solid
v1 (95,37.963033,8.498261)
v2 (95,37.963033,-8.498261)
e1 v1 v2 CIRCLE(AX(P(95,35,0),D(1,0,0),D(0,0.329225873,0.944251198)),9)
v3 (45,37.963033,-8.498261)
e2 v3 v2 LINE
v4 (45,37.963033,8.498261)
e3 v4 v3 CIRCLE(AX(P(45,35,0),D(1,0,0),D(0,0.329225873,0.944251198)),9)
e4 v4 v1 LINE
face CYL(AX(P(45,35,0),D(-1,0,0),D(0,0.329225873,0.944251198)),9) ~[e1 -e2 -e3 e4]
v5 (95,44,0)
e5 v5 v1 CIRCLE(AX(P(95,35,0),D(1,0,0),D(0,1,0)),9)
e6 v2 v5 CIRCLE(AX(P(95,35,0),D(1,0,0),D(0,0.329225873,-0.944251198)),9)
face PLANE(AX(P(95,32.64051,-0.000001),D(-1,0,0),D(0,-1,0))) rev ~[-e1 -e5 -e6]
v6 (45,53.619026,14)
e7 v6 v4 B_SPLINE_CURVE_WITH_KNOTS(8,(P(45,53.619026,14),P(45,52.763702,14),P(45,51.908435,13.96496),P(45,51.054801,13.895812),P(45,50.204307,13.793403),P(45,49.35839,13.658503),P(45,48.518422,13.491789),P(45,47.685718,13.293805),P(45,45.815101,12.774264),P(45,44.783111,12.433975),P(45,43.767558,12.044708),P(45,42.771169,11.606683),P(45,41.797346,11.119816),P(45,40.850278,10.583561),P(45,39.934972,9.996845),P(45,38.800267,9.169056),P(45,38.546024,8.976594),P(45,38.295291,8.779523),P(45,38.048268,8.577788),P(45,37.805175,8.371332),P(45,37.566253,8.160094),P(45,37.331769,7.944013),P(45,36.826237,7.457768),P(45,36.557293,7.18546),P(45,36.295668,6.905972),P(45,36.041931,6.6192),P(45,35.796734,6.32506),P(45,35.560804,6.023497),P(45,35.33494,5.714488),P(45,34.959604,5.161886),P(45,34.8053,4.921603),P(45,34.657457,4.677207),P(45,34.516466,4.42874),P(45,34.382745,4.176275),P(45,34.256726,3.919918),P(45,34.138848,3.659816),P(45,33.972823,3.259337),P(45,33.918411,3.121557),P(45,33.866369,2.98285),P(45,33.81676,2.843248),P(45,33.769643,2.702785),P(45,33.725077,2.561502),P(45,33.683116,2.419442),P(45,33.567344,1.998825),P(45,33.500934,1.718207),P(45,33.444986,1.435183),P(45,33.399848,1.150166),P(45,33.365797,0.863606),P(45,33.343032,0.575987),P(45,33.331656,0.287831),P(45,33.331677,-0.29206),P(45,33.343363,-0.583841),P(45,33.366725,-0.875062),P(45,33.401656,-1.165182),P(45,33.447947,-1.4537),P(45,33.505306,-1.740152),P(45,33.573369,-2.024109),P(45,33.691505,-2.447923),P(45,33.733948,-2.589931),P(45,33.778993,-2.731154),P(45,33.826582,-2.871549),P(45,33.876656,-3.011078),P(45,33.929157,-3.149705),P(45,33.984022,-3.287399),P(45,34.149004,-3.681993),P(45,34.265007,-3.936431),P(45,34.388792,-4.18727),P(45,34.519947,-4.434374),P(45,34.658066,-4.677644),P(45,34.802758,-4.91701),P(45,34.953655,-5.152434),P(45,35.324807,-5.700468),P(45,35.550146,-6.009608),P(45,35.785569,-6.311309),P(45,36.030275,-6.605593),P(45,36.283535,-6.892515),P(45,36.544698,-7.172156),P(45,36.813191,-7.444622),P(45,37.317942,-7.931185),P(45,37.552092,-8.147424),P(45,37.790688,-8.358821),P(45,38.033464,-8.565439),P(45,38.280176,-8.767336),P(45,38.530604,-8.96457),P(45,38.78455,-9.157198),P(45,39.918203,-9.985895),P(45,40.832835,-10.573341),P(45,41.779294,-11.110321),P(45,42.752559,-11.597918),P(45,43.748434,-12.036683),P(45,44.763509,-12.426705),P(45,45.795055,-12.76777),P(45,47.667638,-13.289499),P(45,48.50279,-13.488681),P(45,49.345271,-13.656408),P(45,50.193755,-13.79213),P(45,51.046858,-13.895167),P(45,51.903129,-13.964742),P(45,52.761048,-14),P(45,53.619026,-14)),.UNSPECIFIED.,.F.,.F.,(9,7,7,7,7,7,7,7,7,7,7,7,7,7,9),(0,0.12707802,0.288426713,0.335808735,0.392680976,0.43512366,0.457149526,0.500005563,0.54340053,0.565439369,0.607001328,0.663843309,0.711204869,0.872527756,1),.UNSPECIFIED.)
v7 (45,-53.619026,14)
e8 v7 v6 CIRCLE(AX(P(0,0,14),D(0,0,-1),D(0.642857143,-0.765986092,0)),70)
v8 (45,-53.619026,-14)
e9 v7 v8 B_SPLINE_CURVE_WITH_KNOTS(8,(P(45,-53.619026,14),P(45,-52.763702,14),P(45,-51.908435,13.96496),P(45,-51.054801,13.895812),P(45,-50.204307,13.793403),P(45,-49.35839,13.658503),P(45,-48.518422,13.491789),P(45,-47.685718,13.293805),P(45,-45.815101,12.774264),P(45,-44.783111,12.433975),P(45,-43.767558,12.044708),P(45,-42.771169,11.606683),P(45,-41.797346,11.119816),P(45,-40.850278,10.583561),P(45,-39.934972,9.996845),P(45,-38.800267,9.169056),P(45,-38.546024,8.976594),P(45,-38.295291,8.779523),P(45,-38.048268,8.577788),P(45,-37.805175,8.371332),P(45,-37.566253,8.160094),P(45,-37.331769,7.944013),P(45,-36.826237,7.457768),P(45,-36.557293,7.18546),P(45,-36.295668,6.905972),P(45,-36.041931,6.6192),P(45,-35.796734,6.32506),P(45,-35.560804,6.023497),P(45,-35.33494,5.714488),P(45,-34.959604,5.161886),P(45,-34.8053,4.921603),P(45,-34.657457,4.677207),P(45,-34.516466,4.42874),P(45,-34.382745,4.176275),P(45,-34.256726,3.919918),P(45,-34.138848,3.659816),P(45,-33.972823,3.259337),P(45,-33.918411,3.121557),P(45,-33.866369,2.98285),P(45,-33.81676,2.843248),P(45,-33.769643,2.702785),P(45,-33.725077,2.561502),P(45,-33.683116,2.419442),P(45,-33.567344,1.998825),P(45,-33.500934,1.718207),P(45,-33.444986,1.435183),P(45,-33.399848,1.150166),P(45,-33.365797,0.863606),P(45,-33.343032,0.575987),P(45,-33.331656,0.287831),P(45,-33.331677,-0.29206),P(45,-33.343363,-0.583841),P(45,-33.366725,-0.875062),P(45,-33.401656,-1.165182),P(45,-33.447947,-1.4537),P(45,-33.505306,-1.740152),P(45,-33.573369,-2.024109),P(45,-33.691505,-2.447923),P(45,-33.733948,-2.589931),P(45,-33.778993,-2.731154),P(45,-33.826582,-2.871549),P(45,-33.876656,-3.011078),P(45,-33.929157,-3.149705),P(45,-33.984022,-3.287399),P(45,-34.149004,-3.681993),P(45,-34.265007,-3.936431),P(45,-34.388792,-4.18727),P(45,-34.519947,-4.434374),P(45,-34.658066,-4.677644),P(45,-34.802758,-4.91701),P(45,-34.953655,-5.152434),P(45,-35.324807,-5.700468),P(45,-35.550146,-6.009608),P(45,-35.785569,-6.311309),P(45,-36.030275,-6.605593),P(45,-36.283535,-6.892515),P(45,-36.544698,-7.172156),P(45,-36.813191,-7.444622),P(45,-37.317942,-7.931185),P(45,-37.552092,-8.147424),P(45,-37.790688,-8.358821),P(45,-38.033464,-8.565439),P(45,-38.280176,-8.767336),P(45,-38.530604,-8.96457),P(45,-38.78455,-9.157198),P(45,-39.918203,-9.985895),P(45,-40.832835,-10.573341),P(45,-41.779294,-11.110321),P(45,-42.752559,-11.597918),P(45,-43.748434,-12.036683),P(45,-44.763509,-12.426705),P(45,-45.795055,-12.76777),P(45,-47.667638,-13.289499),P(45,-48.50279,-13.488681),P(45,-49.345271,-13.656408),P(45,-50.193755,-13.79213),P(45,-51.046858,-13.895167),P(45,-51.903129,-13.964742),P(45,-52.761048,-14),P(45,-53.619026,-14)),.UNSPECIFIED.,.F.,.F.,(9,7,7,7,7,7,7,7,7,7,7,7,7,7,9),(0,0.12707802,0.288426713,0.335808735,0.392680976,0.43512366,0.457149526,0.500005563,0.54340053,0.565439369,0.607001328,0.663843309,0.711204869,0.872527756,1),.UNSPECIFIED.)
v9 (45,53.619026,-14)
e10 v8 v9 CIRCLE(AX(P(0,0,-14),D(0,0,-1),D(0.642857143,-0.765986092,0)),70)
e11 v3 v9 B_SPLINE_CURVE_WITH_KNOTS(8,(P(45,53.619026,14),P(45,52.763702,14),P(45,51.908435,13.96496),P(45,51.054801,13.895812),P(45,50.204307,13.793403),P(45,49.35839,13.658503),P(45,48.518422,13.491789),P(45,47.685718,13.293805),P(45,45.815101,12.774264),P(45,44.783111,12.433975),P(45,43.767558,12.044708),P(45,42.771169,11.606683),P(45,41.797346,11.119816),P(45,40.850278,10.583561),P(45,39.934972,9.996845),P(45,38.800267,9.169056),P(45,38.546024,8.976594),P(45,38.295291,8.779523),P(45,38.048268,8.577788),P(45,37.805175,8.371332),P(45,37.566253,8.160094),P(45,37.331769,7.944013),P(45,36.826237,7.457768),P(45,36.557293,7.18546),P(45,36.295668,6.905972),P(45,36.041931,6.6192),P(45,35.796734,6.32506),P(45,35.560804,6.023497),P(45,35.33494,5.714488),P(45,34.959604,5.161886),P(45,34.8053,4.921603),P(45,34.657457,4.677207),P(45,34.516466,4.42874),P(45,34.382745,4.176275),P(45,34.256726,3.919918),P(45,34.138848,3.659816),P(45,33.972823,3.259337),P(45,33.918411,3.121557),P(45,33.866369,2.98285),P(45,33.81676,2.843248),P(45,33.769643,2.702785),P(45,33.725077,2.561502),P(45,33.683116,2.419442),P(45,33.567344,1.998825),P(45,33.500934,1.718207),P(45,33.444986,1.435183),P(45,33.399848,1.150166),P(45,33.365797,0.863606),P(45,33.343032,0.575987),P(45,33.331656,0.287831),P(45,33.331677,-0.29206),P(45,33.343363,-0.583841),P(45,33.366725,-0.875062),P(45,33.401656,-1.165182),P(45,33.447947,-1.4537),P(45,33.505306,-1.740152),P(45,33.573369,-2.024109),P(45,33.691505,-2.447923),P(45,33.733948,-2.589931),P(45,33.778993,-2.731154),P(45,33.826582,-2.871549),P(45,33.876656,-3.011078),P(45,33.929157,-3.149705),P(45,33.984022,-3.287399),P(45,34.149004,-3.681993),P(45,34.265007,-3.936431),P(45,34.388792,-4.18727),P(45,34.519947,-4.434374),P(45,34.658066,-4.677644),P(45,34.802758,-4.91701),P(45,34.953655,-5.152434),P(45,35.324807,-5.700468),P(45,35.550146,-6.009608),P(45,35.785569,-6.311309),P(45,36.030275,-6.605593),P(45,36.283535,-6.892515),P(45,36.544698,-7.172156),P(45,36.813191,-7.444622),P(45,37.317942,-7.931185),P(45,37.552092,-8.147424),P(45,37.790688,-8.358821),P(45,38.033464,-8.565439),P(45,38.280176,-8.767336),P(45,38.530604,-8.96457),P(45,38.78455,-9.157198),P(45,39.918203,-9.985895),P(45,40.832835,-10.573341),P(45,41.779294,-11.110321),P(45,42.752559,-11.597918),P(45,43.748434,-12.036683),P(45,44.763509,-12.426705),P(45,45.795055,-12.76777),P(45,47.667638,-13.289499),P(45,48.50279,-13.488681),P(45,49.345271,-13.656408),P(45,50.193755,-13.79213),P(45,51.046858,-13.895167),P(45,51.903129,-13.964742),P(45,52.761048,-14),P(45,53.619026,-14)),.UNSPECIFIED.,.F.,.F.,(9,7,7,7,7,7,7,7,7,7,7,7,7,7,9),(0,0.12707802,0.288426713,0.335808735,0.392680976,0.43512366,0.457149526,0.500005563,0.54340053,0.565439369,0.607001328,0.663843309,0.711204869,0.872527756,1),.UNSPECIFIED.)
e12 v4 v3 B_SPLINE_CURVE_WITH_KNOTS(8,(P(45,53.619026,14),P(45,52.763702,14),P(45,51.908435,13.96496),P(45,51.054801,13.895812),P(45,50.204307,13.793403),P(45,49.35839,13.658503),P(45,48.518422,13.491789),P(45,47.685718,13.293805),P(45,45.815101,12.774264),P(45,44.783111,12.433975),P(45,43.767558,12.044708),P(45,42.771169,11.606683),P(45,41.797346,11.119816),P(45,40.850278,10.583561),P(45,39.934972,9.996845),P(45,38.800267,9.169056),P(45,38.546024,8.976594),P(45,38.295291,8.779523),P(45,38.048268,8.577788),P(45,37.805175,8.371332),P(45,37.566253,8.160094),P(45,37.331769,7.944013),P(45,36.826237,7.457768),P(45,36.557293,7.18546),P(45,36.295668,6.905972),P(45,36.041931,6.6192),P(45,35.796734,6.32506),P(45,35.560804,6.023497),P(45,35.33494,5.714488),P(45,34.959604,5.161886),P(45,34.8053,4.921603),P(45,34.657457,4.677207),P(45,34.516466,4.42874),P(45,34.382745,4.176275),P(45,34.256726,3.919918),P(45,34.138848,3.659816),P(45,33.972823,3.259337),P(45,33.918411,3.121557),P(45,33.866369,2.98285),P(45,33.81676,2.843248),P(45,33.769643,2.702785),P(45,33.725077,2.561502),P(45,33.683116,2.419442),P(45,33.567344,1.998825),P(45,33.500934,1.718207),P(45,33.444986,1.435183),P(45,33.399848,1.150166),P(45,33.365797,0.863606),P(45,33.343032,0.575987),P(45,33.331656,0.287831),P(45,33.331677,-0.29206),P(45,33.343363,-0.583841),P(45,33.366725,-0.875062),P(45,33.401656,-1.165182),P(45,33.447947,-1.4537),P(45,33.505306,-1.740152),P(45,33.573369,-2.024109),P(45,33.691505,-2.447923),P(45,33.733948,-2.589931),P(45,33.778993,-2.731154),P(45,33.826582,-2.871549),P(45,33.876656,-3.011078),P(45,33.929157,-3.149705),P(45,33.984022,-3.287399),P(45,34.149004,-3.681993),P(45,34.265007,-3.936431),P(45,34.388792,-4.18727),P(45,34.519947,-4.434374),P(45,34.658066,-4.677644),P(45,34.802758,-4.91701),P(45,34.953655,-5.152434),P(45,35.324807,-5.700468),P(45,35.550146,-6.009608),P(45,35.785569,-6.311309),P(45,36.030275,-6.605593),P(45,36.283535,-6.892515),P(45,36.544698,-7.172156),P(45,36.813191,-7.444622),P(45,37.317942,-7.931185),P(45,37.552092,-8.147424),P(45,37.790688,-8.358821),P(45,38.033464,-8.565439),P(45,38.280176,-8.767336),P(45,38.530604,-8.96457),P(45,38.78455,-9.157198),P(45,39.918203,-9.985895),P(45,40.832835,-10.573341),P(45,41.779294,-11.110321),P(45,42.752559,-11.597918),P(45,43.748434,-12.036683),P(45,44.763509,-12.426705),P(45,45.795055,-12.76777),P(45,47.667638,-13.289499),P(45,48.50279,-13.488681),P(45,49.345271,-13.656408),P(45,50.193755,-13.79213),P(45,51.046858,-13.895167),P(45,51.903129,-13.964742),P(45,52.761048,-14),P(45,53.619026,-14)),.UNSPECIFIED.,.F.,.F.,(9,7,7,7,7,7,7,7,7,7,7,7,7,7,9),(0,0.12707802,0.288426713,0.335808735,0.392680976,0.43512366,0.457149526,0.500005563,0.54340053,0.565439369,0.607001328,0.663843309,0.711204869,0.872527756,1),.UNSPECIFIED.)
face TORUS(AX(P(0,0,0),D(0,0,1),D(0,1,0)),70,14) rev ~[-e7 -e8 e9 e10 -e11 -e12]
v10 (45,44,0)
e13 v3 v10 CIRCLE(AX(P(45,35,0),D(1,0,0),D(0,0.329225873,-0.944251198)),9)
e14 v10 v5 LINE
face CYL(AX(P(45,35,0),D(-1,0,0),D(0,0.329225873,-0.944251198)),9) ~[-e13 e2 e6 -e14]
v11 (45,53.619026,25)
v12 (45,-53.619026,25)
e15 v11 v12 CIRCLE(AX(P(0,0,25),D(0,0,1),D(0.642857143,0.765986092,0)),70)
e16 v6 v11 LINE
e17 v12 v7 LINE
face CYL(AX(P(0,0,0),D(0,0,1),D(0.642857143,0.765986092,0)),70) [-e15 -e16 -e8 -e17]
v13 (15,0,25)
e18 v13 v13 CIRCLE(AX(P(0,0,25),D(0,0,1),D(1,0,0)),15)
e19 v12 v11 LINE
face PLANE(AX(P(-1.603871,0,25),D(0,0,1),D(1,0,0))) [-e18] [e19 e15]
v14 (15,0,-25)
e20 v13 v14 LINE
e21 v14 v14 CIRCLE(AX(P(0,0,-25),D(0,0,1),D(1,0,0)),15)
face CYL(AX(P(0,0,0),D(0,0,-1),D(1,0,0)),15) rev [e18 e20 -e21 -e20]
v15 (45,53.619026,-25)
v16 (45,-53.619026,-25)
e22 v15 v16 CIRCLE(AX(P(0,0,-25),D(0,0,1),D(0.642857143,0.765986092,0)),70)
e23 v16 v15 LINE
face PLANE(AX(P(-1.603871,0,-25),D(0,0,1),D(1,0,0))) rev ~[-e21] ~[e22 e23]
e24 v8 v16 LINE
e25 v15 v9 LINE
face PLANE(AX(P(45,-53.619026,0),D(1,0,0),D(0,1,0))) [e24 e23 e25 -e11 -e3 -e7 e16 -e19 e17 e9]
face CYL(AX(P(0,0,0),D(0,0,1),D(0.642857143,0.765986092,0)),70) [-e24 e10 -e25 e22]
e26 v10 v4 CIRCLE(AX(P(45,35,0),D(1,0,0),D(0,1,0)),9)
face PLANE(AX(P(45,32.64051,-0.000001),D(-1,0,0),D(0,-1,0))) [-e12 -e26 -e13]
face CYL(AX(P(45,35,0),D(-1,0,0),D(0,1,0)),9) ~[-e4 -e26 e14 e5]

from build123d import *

# Parameters (mm, degrees)
F0_R     = 15
F1_DEPTH = 25
F5_DEPTH = 50


with BuildPart() as f1:
    # F0 (on Top) → F1 (new body, symmetric)
    with BuildSketch(Plane.XY):
        with BuildLine():
            Line((45, -53.6190264738), (45, 53.6190264738))
            ThreePointArc((45, 53.6190264738), (-70, 0), (45, -53.6190264738))
        make_face()
        Circle(F0_R, mode=Mode.SUBTRACT)
    extrude(amount=F1_DEPTH, both=True)

    # F2 (on Right) → F3 (revolve, cut)
    with BuildSketch(Plane.YZ):
        with BuildLine():
            Line((70, -14), (70, 14))
            ThreePointArc((70, 14), (56, 0), (70, -14))
        make_face()
    revolve(axis=Axis((0, 0, 25), (0, 0, 1)), mode=Mode.SUBTRACT)

    # F4 (on face) → F5 (join)
    with BuildSketch(Plane.YZ.offset(45)):
        with BuildLine():
            add(Edge.make_bspline(
                [(37.9630328609, 8.4982607788), (37.8523435019, 8.4048203415), (37.7424820724, 8.3104014762), (37.6334707776, 8.2149986154), (37.525332792, 8.1186060884), (37.4180922716, 8.0212181078), (37.3117743656, 7.9228287563), (37.2064052286, 7.823431974), (36.826236873, 7.4577676485), (36.5572934764, 7.185459665), (36.2956678052, 6.9059722624), (36.041930817, 6.6191996988), (35.7967338532, 6.3250596485), (35.5608040283, 6.0234970289), (35.3349396191, 5.7144878262), (34.9596041272, 5.1618860399), (34.8053000417, 4.9216027682), (34.6574566137, 4.677206923), (34.5164662374, 4.4287401627), (34.3827450871, 4.1762748231), (34.2567257621, 3.9199178725), (34.1388477747, 3.6598159897), (33.972823057, 3.2593369411), (33.9184105228, 3.1215569007), (33.8663694036, 2.9828498623), (33.8167604551, 2.8432475247), (33.769643447, 2.7027852726), (33.7250765475, 2.5615023849), (33.6831157079, 2.4194422423), (33.567344253, 1.998824599), (33.5009341193, 1.7182071188), (33.444986335, 1.43518271), (33.399847873, 1.1501662245), (33.3657973112, 0.8636063961), (33.3430321538, 0.5759874866), (33.331656153, 0.2878309318), (33.3316772398, -0.2920603513), (33.3433625212, -0.5838406442), (33.36672517, -0.8750615205), (33.4016558858, -1.1651818297), (33.4479469745, -1.4536998647), (33.5053059499, -1.7401515835), (33.5733691351, -2.024108832), (33.6915046183, -2.4479228858), (33.7339482932, -2.5899306957), (33.7789927091, -2.7311537294), (33.82658152, -2.8715490352), (33.8766562279, -3.0110777655), (33.9291567963, -3.1497049676), (33.984022265, -3.2873993744), (34.1490037446, -3.6819927579), (34.2650067533, -3.9364311557), (34.3887918355, -4.1872704013), (34.5199466609, -4.4343744462), (34.6580655419, -4.6776436303), (34.8027579562, -4.9170101221), (34.9536551707, -5.1524343498), (35.3248066319, -5.7004684421), (35.5501463092, -6.0096084062), (35.7855690187, -6.3113088937), (36.030274827, -6.6055929723), (36.2835351055, -6.8925150275), (36.5446977166, -7.1721564153), (36.8131911273, -7.4446219389), (37.1944947346, -7.8121861418), (37.3014725192, -7.9132878967), (37.409432192, -8.0133489318), (37.5183462275, -8.1123756019), (37.6281881757, -8.2103741117), (37.7389326494, -8.3073505305), (37.8505553113, -8.403310806), (37.9630328615, -8.4982607786)],
                knots=[0.3142800556, 0.3142800556, 0.3142800556, 0.3142800556, 0.3142800556, 0.3142800556, 0.3142800556, 0.3142800556, 0.3142800556, 0.3358087351, 0.3358087351, 0.3358087351, 0.3358087351, 0.3358087351, 0.3358087351, 0.3358087351, 0.3926809759, 0.3926809759, 0.3926809759, 0.3926809759, 0.3926809759, 0.3926809759, 0.3926809759, 0.43512366, 0.43512366, 0.43512366, 0.43512366, 0.43512366, 0.43512366, 0.43512366, 0.4571495261, 0.4571495261, 0.4571495261, 0.4571495261, 0.4571495261, 0.4571495261, 0.4571495261, 0.5000055628, 0.5000055628, 0.5000055628, 0.5000055628, 0.5000055628, 0.5000055628, 0.5000055628, 0.5434005305, 0.5434005305, 0.5434005305, 0.5434005305, 0.5434005305, 0.5434005305, 0.5434005305, 0.5654393693, 0.5654393693, 0.5654393693, 0.5654393693, 0.5654393693, 0.5654393693, 0.5654393693, 0.6070013278, 0.6070013278, 0.6070013278, 0.6070013278, 0.6070013278, 0.6070013278, 0.6070013278, 0.6638433094, 0.6638433094, 0.6638433094, 0.6638433094, 0.6638433094, 0.6638433094, 0.6638433094, 0.6857197919, 0.6857197919, 0.6857197919, 0.6857197919, 0.6857197919, 0.6857197919, 0.6857197919, 0.6857197919, 0.6857197919], degree=8))
            ThreePointArc((37.9630328609, 8.4982607788), (26, -3e-10), (37.9630328615, -8.4982607786))
        make_face()
        with BuildLine():
            ThreePointArc((37.9630328615, -8.4982607786), (42.3371416694, -5.212135083), (44, 0))
            ThreePointArc((44, 0), (42.3371416692, 5.2121350832), (37.9630328609, 8.4982607788))
            add(Edge.make_bspline(
                [(37.9630328609, 8.4982607788), (37.8523435019, 8.4048203415), (37.7424820724, 8.3104014762), (37.6334707776, 8.2149986154), (37.525332792, 8.1186060884), (37.4180922716, 8.0212181078), (37.3117743656, 7.9228287563), (37.2064052286, 7.823431974), (36.826236873, 7.4577676485), (36.5572934764, 7.185459665), (36.2956678052, 6.9059722624), (36.041930817, 6.6191996988), (35.7967338532, 6.3250596485), (35.5608040283, 6.0234970289), (35.3349396191, 5.7144878262), (34.9596041272, 5.1618860399), (34.8053000417, 4.9216027682), (34.6574566137, 4.677206923), (34.5164662374, 4.4287401627), (34.3827450871, 4.1762748231), (34.2567257621, 3.9199178725), (34.1388477747, 3.6598159897), (33.972823057, 3.2593369411), (33.9184105228, 3.1215569007), (33.8663694036, 2.9828498623), (33.8167604551, 2.8432475247), (33.769643447, 2.7027852726), (33.7250765475, 2.5615023849), (33.6831157079, 2.4194422423), (33.567344253, 1.998824599), (33.5009341193, 1.7182071188), (33.444986335, 1.43518271), (33.399847873, 1.1501662245), (33.3657973112, 0.8636063961), (33.3430321538, 0.5759874866), (33.331656153, 0.2878309318), (33.3316772398, -0.2920603513), (33.3433625212, -0.5838406442), (33.36672517, -0.8750615205), (33.4016558858, -1.1651818297), (33.4479469745, -1.4536998647), (33.5053059499, -1.7401515835), (33.5733691351, -2.024108832), (33.6915046183, -2.4479228858), (33.7339482932, -2.5899306957), (33.7789927091, -2.7311537294), (33.82658152, -2.8715490352), (33.8766562279, -3.0110777655), (33.9291567963, -3.1497049676), (33.984022265, -3.2873993744), (34.1490037446, -3.6819927579), (34.2650067533, -3.9364311557), (34.3887918355, -4.1872704013), (34.5199466609, -4.4343744462), (34.6580655419, -4.6776436303), (34.8027579562, -4.9170101221), (34.9536551707, -5.1524343498), (35.3248066319, -5.7004684421), (35.5501463092, -6.0096084062), (35.7855690187, -6.3113088937), (36.030274827, -6.6055929723), (36.2835351055, -6.8925150275), (36.5446977166, -7.1721564153), (36.8131911273, -7.4446219389), (37.1944947346, -7.8121861418), (37.3014725192, -7.9132878967), (37.409432192, -8.0133489318), (37.5183462275, -8.1123756019), (37.6281881757, -8.2103741117), (37.7389326494, -8.3073505305), (37.8505553113, -8.403310806), (37.9630328615, -8.4982607786)],
                knots=[0.3142800556, 0.3142800556, 0.3142800556, 0.3142800556, 0.3142800556, 0.3142800556, 0.3142800556, 0.3142800556, 0.3142800556, 0.3358087351, 0.3358087351, 0.3358087351, 0.3358087351, 0.3358087351, 0.3358087351, 0.3358087351, 0.3926809759, 0.3926809759, 0.3926809759, 0.3926809759, 0.3926809759, 0.3926809759, 0.3926809759, 0.43512366, 0.43512366, 0.43512366, 0.43512366, 0.43512366, 0.43512366, 0.43512366, 0.4571495261, 0.4571495261, 0.4571495261, 0.4571495261, 0.4571495261, 0.4571495261, 0.4571495261, 0.5000055628, 0.5000055628, 0.5000055628, 0.5000055628, 0.5000055628, 0.5000055628, 0.5000055628, 0.5434005305, 0.5434005305, 0.5434005305, 0.5434005305, 0.5434005305, 0.5434005305, 0.5434005305, 0.5654393693, 0.5654393693, 0.5654393693, 0.5654393693, 0.5654393693, 0.5654393693, 0.5654393693, 0.6070013278, 0.6070013278, 0.6070013278, 0.6070013278, 0.6070013278, 0.6070013278, 0.6070013278, 0.6638433094, 0.6638433094, 0.6638433094, 0.6638433094, 0.6638433094, 0.6638433094, 0.6638433094, 0.6857197919, 0.6857197919, 0.6857197919, 0.6857197919, 0.6857197919, 0.6857197919, 0.6857197919, 0.6857197919, 0.6857197919], degree=8))
        make_face()
    extrude(amount=F5_DEPTH)


solid = f1.part
